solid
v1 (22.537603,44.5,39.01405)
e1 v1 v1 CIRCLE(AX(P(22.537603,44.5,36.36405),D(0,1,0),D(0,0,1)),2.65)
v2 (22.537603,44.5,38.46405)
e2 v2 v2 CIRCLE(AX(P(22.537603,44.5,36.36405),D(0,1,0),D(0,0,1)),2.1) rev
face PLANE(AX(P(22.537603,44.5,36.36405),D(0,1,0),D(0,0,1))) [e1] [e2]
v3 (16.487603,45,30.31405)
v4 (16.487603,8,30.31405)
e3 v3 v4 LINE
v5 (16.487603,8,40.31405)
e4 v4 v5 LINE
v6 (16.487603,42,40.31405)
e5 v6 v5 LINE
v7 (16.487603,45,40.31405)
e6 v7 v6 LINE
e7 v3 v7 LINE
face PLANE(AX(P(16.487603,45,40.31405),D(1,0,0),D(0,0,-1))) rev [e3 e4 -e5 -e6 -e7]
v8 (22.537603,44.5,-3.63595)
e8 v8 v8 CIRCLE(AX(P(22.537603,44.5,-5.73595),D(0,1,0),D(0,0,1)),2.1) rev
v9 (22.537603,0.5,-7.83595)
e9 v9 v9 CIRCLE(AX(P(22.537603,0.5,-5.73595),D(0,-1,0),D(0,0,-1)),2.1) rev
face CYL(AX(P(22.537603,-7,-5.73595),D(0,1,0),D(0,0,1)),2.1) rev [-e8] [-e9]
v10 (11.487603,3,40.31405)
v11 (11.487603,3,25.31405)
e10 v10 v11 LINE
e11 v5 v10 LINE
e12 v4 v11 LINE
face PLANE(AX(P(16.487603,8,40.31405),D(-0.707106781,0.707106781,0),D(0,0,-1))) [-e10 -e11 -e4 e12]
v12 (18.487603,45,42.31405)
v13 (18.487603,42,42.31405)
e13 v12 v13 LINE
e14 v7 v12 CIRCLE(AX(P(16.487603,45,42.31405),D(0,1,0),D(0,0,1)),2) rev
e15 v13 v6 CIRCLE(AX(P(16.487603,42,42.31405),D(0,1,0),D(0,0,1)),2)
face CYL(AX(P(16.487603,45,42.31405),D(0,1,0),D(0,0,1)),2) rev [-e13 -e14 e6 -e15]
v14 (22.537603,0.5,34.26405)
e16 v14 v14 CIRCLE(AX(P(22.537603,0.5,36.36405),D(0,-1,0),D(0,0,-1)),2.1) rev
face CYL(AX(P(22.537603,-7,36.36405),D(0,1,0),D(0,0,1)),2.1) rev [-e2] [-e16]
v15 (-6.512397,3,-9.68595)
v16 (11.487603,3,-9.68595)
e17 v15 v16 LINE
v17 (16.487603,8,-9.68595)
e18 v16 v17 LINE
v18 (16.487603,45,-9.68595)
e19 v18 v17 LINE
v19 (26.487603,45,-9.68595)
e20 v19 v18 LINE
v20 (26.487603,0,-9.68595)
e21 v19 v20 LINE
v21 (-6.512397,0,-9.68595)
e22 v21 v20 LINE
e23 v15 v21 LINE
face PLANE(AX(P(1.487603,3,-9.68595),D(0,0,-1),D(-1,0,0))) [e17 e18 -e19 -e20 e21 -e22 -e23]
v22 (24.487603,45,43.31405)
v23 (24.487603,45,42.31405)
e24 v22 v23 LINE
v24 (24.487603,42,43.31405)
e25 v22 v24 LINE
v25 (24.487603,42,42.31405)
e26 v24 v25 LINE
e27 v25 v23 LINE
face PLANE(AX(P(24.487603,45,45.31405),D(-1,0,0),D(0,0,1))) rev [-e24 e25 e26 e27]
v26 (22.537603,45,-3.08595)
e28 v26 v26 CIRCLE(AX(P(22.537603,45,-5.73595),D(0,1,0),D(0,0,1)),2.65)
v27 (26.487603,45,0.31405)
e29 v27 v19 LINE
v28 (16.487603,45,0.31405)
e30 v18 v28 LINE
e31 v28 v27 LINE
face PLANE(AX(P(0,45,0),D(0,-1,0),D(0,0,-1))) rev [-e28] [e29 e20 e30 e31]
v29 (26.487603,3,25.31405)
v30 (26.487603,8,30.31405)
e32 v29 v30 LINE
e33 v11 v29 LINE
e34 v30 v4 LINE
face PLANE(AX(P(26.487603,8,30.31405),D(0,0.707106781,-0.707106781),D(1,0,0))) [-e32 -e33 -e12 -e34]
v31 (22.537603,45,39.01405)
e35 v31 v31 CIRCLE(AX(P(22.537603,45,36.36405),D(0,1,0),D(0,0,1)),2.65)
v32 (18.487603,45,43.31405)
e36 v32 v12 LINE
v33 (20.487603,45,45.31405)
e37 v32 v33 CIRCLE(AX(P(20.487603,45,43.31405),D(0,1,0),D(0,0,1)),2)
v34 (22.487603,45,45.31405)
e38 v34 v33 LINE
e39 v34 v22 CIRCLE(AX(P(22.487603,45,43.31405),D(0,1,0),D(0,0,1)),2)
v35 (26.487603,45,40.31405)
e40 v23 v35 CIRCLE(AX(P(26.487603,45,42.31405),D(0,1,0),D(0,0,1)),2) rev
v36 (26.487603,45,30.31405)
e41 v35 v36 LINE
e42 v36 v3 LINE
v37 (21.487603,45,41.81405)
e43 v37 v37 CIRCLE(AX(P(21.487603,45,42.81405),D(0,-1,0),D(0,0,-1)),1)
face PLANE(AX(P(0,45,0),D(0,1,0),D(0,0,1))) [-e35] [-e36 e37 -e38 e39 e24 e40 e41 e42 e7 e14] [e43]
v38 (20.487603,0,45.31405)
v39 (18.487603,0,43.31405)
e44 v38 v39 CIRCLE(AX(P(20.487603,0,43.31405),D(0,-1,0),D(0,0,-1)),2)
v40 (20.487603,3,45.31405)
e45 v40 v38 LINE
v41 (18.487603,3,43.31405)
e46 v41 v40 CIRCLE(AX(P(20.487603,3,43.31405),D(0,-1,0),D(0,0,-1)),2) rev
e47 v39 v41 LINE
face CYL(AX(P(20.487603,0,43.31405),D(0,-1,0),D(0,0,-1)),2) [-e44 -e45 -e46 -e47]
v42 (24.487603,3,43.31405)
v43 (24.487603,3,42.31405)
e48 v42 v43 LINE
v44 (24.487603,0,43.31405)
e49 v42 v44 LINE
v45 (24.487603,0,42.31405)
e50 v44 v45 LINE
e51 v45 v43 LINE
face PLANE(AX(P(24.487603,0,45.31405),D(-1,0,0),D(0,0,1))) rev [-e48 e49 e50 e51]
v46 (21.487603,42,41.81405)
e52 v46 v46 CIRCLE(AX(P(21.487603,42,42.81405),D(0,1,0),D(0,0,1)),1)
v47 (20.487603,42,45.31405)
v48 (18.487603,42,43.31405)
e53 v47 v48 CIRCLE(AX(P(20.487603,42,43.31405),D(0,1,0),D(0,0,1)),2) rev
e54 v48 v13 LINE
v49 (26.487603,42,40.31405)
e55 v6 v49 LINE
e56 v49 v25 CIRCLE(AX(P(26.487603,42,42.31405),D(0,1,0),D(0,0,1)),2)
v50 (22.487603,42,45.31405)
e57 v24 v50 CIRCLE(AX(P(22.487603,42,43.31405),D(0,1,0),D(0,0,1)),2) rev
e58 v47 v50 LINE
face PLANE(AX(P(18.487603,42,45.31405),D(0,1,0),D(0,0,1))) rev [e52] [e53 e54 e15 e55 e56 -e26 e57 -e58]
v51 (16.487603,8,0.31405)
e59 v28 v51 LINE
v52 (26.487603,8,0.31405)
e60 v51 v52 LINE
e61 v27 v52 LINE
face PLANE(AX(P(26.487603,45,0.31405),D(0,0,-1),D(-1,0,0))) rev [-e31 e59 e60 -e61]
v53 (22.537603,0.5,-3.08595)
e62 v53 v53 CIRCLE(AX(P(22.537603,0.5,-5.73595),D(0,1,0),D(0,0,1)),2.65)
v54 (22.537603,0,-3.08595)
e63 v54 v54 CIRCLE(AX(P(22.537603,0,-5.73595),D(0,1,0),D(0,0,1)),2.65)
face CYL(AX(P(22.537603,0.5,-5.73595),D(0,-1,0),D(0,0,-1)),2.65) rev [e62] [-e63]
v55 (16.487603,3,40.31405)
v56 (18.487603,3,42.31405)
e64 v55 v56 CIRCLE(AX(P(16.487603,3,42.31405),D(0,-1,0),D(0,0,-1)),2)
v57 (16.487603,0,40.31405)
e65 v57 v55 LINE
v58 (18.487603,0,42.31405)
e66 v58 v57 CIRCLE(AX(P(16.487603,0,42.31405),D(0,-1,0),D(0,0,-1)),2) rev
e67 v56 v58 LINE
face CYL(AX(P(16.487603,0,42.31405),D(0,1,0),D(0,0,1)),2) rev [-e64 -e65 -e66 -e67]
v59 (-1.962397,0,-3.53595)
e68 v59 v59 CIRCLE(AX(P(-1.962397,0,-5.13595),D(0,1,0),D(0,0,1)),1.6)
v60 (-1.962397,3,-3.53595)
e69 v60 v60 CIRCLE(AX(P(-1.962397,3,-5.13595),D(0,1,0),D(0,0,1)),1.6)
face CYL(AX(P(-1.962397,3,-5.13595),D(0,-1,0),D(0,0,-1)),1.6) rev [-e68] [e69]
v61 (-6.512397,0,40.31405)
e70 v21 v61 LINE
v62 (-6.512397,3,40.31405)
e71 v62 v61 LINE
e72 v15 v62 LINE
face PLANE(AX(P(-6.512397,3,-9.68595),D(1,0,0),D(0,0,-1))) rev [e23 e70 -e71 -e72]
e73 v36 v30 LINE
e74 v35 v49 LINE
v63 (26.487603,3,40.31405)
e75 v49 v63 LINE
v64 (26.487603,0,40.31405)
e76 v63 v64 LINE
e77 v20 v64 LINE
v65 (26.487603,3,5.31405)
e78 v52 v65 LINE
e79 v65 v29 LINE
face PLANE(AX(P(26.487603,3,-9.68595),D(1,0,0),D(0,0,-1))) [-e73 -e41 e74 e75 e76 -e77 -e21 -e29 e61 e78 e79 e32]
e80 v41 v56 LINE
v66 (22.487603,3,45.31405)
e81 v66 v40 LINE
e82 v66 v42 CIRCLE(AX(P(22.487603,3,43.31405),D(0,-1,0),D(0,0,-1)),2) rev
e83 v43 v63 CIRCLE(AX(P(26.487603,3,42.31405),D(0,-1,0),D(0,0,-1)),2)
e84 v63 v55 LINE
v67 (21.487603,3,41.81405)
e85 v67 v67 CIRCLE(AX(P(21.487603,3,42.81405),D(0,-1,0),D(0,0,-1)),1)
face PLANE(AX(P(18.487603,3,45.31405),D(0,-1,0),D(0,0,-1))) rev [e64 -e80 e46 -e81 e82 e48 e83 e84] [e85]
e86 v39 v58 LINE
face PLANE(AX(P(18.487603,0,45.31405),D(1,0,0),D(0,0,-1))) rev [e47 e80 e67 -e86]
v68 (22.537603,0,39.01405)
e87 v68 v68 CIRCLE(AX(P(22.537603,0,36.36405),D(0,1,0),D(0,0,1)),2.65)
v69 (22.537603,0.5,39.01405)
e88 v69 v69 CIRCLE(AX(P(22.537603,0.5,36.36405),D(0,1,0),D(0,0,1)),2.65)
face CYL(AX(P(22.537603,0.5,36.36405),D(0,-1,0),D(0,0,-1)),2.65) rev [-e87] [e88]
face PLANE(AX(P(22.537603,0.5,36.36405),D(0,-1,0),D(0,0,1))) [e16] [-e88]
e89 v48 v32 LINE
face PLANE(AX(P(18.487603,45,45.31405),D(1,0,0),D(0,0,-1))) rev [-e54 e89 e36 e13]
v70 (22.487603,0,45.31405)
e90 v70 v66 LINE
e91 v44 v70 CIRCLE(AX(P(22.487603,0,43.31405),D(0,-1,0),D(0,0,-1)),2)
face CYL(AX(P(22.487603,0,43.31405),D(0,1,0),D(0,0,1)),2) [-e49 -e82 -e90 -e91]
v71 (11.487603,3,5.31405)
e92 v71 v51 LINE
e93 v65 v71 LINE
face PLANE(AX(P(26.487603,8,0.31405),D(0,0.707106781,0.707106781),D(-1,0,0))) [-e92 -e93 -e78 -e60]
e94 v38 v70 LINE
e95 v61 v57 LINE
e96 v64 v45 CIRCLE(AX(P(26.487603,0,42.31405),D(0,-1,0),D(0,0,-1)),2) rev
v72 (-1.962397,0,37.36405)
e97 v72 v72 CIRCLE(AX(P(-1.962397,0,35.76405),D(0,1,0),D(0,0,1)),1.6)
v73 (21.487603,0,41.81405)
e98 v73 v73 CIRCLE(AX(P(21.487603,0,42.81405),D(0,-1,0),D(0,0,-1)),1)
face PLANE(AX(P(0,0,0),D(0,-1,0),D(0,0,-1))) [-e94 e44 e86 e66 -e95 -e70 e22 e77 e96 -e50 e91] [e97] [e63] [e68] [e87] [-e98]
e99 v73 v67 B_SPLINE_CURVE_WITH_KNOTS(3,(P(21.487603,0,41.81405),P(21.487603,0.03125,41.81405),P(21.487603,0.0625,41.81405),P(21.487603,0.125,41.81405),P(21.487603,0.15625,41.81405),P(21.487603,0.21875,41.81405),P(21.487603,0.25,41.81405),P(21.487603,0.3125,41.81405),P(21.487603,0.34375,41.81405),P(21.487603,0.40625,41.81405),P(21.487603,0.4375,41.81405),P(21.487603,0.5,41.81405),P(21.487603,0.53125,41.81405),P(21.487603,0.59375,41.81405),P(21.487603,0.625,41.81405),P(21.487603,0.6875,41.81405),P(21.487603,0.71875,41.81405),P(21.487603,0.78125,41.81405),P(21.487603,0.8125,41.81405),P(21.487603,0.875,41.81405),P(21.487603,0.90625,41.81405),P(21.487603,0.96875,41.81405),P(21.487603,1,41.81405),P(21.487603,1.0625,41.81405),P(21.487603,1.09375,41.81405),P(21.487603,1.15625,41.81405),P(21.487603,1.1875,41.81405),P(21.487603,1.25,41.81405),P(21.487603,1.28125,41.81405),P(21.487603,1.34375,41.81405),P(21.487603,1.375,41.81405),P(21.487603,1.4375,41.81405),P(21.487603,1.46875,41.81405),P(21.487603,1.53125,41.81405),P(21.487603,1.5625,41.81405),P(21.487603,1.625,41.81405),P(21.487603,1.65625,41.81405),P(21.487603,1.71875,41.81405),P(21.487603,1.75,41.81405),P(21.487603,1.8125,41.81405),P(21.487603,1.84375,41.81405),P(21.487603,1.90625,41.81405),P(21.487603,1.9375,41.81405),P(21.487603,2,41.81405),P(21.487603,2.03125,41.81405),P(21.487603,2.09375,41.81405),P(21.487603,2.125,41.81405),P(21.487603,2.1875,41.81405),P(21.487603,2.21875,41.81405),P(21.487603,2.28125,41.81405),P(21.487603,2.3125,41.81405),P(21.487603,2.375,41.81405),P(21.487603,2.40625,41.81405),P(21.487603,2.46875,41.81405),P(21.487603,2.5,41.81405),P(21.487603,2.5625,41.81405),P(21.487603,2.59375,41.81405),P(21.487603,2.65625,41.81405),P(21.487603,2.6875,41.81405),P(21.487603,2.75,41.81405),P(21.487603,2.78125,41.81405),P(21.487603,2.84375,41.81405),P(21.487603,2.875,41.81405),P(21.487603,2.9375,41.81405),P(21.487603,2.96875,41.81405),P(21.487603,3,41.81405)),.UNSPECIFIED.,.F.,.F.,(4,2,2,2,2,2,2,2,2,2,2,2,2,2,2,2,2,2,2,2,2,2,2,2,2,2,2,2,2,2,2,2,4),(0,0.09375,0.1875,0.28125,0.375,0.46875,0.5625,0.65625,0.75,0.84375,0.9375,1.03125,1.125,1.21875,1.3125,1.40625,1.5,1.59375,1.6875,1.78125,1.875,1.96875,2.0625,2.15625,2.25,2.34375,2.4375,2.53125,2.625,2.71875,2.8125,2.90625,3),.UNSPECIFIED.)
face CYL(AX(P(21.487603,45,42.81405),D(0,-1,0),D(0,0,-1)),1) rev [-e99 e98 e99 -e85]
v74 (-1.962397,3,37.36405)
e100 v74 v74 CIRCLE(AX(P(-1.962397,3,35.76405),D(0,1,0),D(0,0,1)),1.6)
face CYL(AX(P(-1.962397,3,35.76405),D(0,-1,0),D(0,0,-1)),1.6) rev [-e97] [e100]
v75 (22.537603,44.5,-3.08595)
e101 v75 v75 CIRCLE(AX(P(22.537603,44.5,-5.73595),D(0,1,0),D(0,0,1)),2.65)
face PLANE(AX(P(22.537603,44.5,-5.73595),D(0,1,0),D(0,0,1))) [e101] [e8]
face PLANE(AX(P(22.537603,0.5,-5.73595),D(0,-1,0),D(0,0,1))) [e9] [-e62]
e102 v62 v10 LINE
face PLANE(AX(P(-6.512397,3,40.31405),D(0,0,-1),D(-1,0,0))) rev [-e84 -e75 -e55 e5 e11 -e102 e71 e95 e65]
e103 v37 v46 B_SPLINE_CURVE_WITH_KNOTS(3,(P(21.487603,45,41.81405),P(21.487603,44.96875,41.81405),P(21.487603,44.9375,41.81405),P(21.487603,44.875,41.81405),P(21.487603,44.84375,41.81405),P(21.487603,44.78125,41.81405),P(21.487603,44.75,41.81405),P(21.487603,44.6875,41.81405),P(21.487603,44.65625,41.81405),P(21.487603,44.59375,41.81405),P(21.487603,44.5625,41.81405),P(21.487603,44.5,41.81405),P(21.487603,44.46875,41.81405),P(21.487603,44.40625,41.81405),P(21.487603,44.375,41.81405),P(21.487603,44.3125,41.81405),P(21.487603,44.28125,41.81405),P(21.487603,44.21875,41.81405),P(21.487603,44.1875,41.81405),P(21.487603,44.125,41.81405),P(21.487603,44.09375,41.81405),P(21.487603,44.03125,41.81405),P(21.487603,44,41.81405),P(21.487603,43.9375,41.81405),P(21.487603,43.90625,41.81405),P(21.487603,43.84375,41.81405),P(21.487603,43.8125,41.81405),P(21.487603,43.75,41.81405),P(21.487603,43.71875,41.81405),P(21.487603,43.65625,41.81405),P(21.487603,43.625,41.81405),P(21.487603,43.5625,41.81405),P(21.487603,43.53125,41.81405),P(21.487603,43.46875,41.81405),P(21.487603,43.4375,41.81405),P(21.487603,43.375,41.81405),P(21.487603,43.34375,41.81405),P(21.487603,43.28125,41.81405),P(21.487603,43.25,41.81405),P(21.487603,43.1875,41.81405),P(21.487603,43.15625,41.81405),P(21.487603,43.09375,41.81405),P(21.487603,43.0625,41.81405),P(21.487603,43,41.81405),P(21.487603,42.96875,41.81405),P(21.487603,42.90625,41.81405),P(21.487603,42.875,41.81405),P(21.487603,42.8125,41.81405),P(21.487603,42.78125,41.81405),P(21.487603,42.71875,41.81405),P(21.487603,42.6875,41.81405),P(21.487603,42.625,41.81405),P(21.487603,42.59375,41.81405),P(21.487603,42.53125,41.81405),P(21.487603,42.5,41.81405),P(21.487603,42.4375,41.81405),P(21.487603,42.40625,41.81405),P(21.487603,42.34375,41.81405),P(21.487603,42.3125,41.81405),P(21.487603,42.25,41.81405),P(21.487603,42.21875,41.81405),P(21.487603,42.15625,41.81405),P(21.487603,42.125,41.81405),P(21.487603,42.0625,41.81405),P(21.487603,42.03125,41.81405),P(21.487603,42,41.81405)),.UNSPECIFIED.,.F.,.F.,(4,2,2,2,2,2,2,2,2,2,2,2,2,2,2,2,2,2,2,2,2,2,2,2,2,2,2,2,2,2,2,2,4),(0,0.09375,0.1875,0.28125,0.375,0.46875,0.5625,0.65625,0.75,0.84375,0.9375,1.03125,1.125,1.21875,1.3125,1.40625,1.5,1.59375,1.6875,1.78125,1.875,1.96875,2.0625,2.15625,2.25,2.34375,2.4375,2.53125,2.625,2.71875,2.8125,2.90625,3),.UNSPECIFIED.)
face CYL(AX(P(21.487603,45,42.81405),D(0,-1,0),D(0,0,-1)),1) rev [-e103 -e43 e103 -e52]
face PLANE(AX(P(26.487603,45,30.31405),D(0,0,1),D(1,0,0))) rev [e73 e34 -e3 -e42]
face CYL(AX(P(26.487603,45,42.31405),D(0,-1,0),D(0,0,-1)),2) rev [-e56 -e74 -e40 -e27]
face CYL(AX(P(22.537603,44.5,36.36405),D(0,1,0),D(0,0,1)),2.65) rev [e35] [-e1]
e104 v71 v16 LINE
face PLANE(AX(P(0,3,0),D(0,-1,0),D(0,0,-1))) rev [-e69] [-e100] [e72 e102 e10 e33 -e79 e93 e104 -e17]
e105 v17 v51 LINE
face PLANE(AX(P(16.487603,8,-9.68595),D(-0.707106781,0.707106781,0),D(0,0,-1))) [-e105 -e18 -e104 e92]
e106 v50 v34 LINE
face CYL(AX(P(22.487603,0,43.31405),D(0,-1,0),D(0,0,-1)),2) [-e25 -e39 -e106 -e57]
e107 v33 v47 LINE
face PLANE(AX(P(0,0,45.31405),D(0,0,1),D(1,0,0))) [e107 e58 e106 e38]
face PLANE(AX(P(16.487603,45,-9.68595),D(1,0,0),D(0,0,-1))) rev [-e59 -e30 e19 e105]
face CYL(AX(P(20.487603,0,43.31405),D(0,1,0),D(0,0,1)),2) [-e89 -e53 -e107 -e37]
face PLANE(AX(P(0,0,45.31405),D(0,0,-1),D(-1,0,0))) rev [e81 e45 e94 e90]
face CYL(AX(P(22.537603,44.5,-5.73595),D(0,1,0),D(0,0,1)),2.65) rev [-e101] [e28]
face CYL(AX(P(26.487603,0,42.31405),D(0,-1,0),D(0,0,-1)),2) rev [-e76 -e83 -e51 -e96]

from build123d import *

# Parameters (mm, degrees)
SKETCH1_R           = 1.6
BOSS_EXTRUDE1_DEPTH = 3
SKETCH2_W           = 10
SKETCH2_H           = 10
BOSS_EXTRUDE2_DEPTH = 42
CHAMFER1_SIZE       = 5
SKETCH3_R           = 2.1
CUT_EXTRUDE1_DEPTH  = 52
SKETCH4_R           = 2.65
CUT_EXTRUDE2_DEPTH  = 0.5
SKETCH11_W          = 6
SKETCH11_H          = 3
BOSS_EXTRUDE7_DEPTH = 5
SKETCH12_R          = 1
CUT_EXTRUDE5_DEPTH  = 70.137227445
FILLET1_R           = 2


with BuildPart() as part:
    # Sketch1 → Boss-Extrude1 (new body)
    with BuildSketch(Plane(origin=(0, 0, 0), x_dir=(1, 0, 0), z_dir=(0, 1, 0))):
        Polygon((-6.512396694, 9.685950413), (1.487603306, 9.685950413), (26.487603306, 9.685950413), (26.487603306, -40.314049587), (1.487603306, -40.314049587), (-6.512396694, -40.314049587), align=None)
        with Locations(Location((-1.962396694, -35.764049587, 0), (0, 0, 270))):
            Circle(SKETCH1_R, mode=Mode.SUBTRACT)
        with Locations(Location((-1.962396694, 5.135950413, 0), (0, 0, 270))):
            Circle(SKETCH1_R, mode=Mode.SUBTRACT)
    extrude(amount=BOSS_EXTRUDE1_DEPTH)

    # Sketch2 → Boss-Extrude2 (add)
    with BuildSketch(Plane(origin=(0, 3, 0), x_dir=(1, 0, 0), z_dir=(0, 1, 0))):
        with Locations((21.487603306, -35.314049587)):
            Rectangle(SKETCH2_W, SKETCH2_H)
        with Locations((21.487603306, 4.685950413)):
            Rectangle(SKETCH2_W, SKETCH2_H)
    extrude(amount=BOSS_EXTRUDE2_DEPTH)

    # Chamfer1
    chamfer1_edges = [part.edges().sort_by_distance(p)[0] for p in [
        (21.487603306, 3, 30.314049587),
        (16.487603306, 3, 35.314049587),
        (16.487603306, 3, -4.685950413),
        (21.487603306, 3, 0.314049587),
    ]]
    chamfer(chamfer1_edges, length=CHAMFER1_SIZE)

    # Sketch3 → Cut-Extrude1 (cut)
    with BuildSketch(Plane(origin=(0, 45, 0), x_dir=(1, 0, 0), z_dir=(0, 1, 0))):
        with Locations(Location((22.537603306, -36.364049587, 0), (0, 0, 270))):
            Circle(SKETCH3_R)
        with Locations(Location((22.537603306, 5.735950413, 0), (0, 0, 270))):
            Circle(SKETCH3_R)
    extrude(amount=-CUT_EXTRUDE1_DEPTH, mode=Mode.SUBTRACT)

    # Sketch4 → Cut-Extrude2 (cut)
    with BuildSketch(Plane(origin=(0, 45, 0), x_dir=(1, 0, 0), z_dir=(0, 1, 0))):
        with Locations(Location((22.537603306, -36.364049587, 0), (0, 0, 270))):
            Circle(SKETCH4_R)
        with Locations(Location((22.537603306, 5.735950413, 0), (0, 0, 270))):
            Circle(SKETCH4_R)
    cut_extrude2 = extrude(amount=-CUT_EXTRUDE2_DEPTH, mode=Mode.SUBTRACT)

    # Mirror1: Cut-Extrude2 across plane
    add(cut_extrude2.mirror(Plane(origin=(0, 22.5, 0), x_dir=(0, 0, 1), z_dir=(0, -1, 0))), mode=Mode.SUBTRACT)

    # Sketch11 → Boss-Extrude7 (add)
    with BuildSketch(Plane.XY.offset(40.314049587)):
        with Locations((21.487603306, 43.5)):
            Rectangle(SKETCH11_W, SKETCH11_H)
        with Locations((21.487603306, 1.5)):
            Rectangle(SKETCH11_W, SKETCH11_H)
    extrude(amount=BOSS_EXTRUDE7_DEPTH)

    # Sketch12 → Cut-Extrude5 (cut, through all)
    with BuildSketch(Plane.XZ):
        with Locations(Location((21.487603306, 42.814049587, 0), (0, 0, 270))):
            Circle(SKETCH12_R)
    extrude(amount=-CUT_EXTRUDE5_DEPTH, mode=Mode.SUBTRACT)

    # Fillet1
    fillet1_edges = [part.edges().sort_by_distance(p)[0] for p in [
        (18.487603306, 43.5, 40.314049587),
        (24.487603306, 43.5, 40.314049587),
        (18.487603306, 1.5, 40.314049587),
        (24.487603306, 1.5, 40.314049587),
    ]]
    fillet(fillet1_edges, radius=FILLET1_R - 0.0001)  # a hair under: the kernel refuses the full size
    fillet1_2_edges = [part.edges().sort_by_distance(p)[0] for p in [
        (18.487603306, 43.5, 45.314049587),
        (24.487603306, 43.5, 45.314049587),
        (24.487603306, 1.5, 45.314049587),
        (18.487603306, 1.5, 45.314049587),
    ]]
    fillet(fillet1_2_edges, radius=FILLET1_R)


solid = part.part
